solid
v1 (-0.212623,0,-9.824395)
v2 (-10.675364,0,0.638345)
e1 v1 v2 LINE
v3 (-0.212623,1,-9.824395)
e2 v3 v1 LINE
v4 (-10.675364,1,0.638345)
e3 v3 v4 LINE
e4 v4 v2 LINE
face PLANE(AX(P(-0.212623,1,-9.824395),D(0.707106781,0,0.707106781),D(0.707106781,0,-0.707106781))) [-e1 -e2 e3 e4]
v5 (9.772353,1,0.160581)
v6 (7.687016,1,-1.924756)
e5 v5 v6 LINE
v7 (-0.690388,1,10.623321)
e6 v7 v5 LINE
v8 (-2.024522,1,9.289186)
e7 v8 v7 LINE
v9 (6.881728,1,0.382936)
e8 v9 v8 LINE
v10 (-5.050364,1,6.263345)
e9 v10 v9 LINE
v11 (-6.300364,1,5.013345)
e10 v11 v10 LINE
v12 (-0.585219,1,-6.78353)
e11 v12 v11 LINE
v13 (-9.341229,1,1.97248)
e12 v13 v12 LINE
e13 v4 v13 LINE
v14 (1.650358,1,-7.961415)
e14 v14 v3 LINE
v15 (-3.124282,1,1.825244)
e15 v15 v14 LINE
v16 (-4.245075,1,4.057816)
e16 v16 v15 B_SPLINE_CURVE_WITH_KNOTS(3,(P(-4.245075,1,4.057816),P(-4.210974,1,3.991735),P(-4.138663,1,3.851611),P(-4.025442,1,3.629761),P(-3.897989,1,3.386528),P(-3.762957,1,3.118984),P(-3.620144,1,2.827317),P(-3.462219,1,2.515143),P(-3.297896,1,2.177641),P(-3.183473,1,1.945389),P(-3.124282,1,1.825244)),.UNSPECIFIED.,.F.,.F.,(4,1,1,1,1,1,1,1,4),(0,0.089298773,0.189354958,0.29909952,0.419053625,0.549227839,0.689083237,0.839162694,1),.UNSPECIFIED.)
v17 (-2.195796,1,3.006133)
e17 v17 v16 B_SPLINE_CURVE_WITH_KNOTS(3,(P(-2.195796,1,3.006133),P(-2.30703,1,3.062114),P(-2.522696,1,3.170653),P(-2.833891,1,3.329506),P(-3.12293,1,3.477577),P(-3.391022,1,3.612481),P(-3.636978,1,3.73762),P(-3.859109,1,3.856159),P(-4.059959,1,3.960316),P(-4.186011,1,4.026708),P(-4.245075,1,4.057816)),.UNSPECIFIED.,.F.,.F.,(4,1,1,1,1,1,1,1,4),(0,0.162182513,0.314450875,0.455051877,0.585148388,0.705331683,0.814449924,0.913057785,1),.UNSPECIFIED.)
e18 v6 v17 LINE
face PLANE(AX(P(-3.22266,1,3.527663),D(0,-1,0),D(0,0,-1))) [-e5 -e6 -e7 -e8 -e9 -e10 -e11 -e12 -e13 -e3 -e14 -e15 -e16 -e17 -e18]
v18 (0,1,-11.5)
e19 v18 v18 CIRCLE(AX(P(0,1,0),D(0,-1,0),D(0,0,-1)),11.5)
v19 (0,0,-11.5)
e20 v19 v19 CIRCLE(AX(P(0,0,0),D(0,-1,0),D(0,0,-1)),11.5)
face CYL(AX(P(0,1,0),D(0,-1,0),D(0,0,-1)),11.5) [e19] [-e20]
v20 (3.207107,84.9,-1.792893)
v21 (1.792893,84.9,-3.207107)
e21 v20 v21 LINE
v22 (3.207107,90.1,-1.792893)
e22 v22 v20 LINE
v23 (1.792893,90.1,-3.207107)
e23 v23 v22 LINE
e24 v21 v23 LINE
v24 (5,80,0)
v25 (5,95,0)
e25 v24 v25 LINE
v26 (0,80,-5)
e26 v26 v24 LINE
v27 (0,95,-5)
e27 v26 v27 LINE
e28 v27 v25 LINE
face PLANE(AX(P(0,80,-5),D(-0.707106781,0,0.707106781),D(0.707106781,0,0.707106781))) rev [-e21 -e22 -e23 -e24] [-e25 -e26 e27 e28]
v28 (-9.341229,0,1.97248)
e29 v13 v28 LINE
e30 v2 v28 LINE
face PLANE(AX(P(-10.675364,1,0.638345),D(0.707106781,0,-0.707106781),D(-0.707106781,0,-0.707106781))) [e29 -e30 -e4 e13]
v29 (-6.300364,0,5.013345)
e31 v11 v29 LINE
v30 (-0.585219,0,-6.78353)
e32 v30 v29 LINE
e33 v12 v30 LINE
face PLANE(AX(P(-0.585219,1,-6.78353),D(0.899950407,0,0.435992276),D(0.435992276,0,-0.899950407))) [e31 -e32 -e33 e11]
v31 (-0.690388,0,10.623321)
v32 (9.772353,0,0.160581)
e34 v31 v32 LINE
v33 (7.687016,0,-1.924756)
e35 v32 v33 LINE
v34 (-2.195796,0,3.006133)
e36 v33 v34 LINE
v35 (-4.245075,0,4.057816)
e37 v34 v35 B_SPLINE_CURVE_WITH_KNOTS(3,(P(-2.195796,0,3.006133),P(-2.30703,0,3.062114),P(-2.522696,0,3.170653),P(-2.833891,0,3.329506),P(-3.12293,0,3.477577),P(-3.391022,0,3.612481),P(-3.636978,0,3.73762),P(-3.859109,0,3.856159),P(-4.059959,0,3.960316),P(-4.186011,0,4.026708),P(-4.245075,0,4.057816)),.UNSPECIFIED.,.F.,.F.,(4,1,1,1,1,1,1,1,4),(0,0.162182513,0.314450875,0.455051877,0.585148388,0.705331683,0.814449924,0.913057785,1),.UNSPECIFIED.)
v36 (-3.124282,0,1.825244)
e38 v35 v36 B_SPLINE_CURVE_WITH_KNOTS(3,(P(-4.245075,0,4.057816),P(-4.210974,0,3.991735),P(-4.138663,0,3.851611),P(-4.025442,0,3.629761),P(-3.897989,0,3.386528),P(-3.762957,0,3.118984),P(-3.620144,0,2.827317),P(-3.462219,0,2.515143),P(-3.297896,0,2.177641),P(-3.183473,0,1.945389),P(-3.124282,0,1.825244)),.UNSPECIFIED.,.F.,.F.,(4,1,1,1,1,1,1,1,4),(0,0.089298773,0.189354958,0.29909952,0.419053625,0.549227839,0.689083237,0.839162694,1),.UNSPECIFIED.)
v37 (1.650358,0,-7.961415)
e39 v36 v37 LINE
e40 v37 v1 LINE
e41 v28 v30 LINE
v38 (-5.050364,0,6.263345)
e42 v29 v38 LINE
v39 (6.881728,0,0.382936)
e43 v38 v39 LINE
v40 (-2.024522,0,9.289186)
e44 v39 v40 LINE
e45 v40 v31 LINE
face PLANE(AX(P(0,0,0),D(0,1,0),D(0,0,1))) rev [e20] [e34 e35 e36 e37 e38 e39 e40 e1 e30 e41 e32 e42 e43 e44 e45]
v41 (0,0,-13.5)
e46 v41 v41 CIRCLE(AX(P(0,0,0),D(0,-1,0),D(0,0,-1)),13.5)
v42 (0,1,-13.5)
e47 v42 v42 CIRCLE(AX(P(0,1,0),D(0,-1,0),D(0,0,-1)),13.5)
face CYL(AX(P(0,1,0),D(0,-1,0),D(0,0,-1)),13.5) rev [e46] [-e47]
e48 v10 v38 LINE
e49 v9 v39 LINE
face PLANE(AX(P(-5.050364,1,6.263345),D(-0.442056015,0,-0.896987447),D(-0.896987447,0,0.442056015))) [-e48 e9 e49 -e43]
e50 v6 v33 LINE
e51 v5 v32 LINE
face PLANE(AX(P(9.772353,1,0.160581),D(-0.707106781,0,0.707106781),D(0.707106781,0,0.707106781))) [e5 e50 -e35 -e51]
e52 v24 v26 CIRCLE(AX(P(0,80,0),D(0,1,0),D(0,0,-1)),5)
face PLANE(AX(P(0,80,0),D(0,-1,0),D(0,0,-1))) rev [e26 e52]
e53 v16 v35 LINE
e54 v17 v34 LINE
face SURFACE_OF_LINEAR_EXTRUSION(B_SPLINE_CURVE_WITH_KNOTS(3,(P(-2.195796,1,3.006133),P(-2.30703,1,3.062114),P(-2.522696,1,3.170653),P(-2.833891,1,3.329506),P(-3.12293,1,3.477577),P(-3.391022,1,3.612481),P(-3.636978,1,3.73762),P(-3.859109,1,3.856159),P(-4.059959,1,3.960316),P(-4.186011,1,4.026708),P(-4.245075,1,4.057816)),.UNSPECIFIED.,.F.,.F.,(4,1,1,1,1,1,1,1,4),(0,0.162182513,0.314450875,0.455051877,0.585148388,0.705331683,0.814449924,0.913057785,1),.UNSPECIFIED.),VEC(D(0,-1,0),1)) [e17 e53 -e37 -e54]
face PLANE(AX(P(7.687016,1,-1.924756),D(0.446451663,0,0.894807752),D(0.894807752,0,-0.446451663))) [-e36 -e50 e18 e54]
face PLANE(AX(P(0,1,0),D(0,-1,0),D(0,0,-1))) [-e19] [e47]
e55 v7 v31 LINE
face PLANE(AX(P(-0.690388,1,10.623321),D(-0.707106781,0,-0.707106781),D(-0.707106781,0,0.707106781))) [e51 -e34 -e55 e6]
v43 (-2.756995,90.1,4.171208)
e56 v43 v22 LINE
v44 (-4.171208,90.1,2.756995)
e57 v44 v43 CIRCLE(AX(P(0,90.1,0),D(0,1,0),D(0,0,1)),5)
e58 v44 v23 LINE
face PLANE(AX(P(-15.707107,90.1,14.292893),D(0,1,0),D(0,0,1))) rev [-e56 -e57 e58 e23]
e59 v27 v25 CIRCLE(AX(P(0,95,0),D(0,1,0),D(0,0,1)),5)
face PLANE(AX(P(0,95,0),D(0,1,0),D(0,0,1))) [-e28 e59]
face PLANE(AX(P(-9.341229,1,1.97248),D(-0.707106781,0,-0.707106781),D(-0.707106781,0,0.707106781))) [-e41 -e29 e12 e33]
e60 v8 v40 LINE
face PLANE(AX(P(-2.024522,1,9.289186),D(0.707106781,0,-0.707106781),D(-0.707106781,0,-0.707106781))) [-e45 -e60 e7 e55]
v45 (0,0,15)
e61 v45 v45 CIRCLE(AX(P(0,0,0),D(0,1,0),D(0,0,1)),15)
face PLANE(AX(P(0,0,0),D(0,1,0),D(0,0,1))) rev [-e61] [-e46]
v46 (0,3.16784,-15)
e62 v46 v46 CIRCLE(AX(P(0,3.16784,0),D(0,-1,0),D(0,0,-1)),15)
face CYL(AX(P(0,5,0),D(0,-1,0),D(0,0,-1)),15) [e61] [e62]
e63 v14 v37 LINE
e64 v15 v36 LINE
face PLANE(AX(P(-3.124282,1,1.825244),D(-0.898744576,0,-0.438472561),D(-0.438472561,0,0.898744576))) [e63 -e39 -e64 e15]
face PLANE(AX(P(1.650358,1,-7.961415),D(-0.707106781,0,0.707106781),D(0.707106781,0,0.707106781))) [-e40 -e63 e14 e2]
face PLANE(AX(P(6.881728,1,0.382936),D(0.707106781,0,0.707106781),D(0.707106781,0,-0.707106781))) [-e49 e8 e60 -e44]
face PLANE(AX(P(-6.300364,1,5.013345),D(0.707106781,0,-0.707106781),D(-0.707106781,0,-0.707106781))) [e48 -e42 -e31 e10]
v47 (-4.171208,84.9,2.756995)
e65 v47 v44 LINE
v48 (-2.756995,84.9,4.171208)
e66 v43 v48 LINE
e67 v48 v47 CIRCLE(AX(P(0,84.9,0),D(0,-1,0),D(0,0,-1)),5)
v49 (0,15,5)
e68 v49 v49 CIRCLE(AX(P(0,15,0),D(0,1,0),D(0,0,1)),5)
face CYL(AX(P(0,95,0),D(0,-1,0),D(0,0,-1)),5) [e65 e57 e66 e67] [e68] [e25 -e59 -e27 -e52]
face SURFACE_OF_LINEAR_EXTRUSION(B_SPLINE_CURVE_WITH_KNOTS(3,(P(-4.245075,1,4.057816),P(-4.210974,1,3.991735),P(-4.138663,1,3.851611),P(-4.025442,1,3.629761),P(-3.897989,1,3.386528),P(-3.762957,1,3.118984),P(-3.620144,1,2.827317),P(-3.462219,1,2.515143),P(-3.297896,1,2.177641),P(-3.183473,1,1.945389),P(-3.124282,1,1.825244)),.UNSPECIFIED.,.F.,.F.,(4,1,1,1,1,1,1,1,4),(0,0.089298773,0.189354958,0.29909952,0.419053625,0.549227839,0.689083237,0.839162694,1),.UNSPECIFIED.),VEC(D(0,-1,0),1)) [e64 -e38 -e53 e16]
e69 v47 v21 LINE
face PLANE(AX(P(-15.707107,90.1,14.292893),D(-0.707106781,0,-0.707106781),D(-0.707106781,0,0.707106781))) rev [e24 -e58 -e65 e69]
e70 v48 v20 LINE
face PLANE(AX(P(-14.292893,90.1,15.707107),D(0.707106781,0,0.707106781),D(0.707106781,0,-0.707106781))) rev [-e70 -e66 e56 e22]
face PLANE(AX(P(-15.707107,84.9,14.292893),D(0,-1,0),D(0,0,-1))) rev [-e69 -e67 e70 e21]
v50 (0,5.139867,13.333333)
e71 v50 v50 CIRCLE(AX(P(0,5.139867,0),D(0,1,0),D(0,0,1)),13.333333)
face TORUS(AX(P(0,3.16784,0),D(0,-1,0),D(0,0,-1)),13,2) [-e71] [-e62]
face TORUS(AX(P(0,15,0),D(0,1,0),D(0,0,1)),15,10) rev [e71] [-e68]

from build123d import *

# Parameters (mm, degrees)
SKETCH1_R           = 15
BOSS_EXTRUDE1_DEPTH = 5
SKETCH2_R           = 5
BOSS_EXTRUDE2_DEPTH = 90
CUT_EXTRUDE1_START  = -15
CUT_EXTRUDE1_DEPTH  = 15
SKETCH4_W           = 2
SKETCH4_H           = 5.2
CUT_EXTRUDE2_DEPTH  = 99.17076958
FILLET1_R           = 10
FILLET2_R           = 2
CUT_EXTRUDE3_DEPTH  = 1
SKETCH6_R           = 13.5
SKETCH6_R_2         = 11.5
CUT_EXTRUDE4_DEPTH  = 1


with BuildPart() as part:
    # Sketch1 → Boss-Extrude1 (new body)
    with BuildSketch(Plane(origin=(0, 0, 0), x_dir=(1, 0, 0), z_dir=(0, 1, 0))):
        with Locations(Location((0, 0, 0), (0, 0, 270))):
            Circle(SKETCH1_R)
    extrude(amount=BOSS_EXTRUDE1_DEPTH)

    # Sketch2 → Boss-Extrude2 (add)
    with BuildSketch(Plane(origin=(0, 5, 0), x_dir=(1, 0, 0), z_dir=(0, 1, 0))):
        with Locations(Location((0, 0, 0), (0, 0, 90))):
            Circle(SKETCH2_R)
    extrude(amount=BOSS_EXTRUDE2_DEPTH)

    # Sketch3 → Cut-Extrude1 (cut)
    with BuildSketch(Plane(origin=(0, 95, 0), x_dir=(1, 0, 0), z_dir=(0, 1, 0)).offset(CUT_EXTRUDE1_START)):
        with BuildLine():
            Line((0, 5), (5, 0))
            ThreePointArc((5, 0), (3.535533906, 3.535533906), (0, 5))
        make_face()
    extrude(amount=CUT_EXTRUDE1_DEPTH, mode=Mode.SUBTRACT)

    # Sketch4 → Cut-Extrude2 (cut, through all)
    with BuildSketch(Plane(origin=(2.5, 0, -2.5), x_dir=(-0.7071067811865475, 0, -0.7071067811865477), z_dir=(0.7071067811865477, 0, -0.7071067811865475))):
        with Locations((0, 87.5)):
            Rectangle(SKETCH4_W, SKETCH4_H)
    extrude(amount=-CUT_EXTRUDE2_DEPTH, mode=Mode.SUBTRACT)

    # Fillet1
    fillet1_edges = [part.edges().sort_by_distance(p)[0] for p in [
        (0, 5, 5),
    ]]
    fillet(fillet1_edges, radius=FILLET1_R - 0.0001)  # a hair under: the kernel refuses the full size

    # Fillet2
    fillet2_edges = [part.edges().sort_by_distance(p)[0] for p in [
        (0, 5, -15),
    ]]
    fillet(fillet2_edges, radius=FILLET2_R)

    # Sketch5 → Cut-Extrude3 (cut)
    with BuildSketch(Plane.XZ):
        with BuildLine():
            Line((-0.690387564, 10.623320935), (9.77235282, 0.16058055))
            Line((9.77235282, 0.16058055), (7.687016282, -1.924755988))
            Line((7.687016282, -1.924755988), (-2.195796218, 3.006133435))
            add(Edge.make_bspline(
                [(-2.195796218, 3.006133435), (-2.307029511, 3.062113904), (-2.52269645, 3.170652781), (-2.833890677, 3.329506222), (-3.122930247, 3.477577181), (-3.391022331, 3.612480856), (-3.636978399, 3.737620248), (-3.85910859, 3.856159494), (-4.059958905, 3.960316417), (-4.186011343, 4.026707574), (-4.245075064, 4.057816127)],
                knots=[0, 0, 0, 0, 1.297460102, 2.515607, 3.640415016, 4.681187102, 5.642653462, 6.515599393, 7.304462283, 8, 8, 8, 8], degree=3))
            add(Edge.make_bspline(
                [(-4.245075064, 4.057816127), (-4.210973718, 3.991734504), (-4.138662994, 3.851610709), (-4.025441526, 3.629760807), (-3.897989309, 3.38652834), (-3.762956902, 3.118983989), (-3.620144132, 2.827316511), (-3.462218864, 2.515142559), (-3.297896109, 2.177641474), (-3.18347293, 1.945388515), (-3.124281795, 1.825244012)],
                knots=[0, 0, 0, 0, 0.714390188, 1.514839662, 2.392796159, 3.352429004, 4.393822708, 5.512665897, 6.71330155, 8, 8, 8, 8], degree=3))
            Line((-3.124281795, 1.825244012), (1.650357628, -7.961414642))
            Line((1.650357628, -7.961414642), (-0.212623141, -9.824395412))
            Line((-0.212623141, -9.824395412), (-10.675363526, 0.638344973))
            Line((-10.675363526, 0.638344973), (-9.34122891, 1.972479588))
            Line((-9.34122891, 1.972479588), (-0.585219295, -6.783530027))
            Line((-0.585219295, -6.783530027), (-6.300363526, 5.013344973))
            Line((-6.300363526, 5.013344973), (-5.050363526, 6.263344973))
            Line((-5.050363526, 6.263344973), (6.88172782, 0.382936319))
            Line((6.88172782, 0.382936319), (-2.02452218, 9.289186319))
            Line((-2.02452218, 9.289186319), (-0.690387564, 10.623320935))
        make_face()
    extrude(amount=-CUT_EXTRUDE3_DEPTH, mode=Mode.SUBTRACT)

    # Sketch6 → Cut-Extrude4 (cut)
    with BuildSketch(Plane.XZ):
        with Locations(Location((0, 0, 0), (0, 0, 270))):
            Circle(SKETCH6_R)
        with Locations(Location((0, 0, 0), (0, 0, 270))):
            Circle(SKETCH6_R_2, mode=Mode.SUBTRACT)
    extrude(amount=-CUT_EXTRUDE4_DEPTH, mode=Mode.SUBTRACT)


solid = part.part
